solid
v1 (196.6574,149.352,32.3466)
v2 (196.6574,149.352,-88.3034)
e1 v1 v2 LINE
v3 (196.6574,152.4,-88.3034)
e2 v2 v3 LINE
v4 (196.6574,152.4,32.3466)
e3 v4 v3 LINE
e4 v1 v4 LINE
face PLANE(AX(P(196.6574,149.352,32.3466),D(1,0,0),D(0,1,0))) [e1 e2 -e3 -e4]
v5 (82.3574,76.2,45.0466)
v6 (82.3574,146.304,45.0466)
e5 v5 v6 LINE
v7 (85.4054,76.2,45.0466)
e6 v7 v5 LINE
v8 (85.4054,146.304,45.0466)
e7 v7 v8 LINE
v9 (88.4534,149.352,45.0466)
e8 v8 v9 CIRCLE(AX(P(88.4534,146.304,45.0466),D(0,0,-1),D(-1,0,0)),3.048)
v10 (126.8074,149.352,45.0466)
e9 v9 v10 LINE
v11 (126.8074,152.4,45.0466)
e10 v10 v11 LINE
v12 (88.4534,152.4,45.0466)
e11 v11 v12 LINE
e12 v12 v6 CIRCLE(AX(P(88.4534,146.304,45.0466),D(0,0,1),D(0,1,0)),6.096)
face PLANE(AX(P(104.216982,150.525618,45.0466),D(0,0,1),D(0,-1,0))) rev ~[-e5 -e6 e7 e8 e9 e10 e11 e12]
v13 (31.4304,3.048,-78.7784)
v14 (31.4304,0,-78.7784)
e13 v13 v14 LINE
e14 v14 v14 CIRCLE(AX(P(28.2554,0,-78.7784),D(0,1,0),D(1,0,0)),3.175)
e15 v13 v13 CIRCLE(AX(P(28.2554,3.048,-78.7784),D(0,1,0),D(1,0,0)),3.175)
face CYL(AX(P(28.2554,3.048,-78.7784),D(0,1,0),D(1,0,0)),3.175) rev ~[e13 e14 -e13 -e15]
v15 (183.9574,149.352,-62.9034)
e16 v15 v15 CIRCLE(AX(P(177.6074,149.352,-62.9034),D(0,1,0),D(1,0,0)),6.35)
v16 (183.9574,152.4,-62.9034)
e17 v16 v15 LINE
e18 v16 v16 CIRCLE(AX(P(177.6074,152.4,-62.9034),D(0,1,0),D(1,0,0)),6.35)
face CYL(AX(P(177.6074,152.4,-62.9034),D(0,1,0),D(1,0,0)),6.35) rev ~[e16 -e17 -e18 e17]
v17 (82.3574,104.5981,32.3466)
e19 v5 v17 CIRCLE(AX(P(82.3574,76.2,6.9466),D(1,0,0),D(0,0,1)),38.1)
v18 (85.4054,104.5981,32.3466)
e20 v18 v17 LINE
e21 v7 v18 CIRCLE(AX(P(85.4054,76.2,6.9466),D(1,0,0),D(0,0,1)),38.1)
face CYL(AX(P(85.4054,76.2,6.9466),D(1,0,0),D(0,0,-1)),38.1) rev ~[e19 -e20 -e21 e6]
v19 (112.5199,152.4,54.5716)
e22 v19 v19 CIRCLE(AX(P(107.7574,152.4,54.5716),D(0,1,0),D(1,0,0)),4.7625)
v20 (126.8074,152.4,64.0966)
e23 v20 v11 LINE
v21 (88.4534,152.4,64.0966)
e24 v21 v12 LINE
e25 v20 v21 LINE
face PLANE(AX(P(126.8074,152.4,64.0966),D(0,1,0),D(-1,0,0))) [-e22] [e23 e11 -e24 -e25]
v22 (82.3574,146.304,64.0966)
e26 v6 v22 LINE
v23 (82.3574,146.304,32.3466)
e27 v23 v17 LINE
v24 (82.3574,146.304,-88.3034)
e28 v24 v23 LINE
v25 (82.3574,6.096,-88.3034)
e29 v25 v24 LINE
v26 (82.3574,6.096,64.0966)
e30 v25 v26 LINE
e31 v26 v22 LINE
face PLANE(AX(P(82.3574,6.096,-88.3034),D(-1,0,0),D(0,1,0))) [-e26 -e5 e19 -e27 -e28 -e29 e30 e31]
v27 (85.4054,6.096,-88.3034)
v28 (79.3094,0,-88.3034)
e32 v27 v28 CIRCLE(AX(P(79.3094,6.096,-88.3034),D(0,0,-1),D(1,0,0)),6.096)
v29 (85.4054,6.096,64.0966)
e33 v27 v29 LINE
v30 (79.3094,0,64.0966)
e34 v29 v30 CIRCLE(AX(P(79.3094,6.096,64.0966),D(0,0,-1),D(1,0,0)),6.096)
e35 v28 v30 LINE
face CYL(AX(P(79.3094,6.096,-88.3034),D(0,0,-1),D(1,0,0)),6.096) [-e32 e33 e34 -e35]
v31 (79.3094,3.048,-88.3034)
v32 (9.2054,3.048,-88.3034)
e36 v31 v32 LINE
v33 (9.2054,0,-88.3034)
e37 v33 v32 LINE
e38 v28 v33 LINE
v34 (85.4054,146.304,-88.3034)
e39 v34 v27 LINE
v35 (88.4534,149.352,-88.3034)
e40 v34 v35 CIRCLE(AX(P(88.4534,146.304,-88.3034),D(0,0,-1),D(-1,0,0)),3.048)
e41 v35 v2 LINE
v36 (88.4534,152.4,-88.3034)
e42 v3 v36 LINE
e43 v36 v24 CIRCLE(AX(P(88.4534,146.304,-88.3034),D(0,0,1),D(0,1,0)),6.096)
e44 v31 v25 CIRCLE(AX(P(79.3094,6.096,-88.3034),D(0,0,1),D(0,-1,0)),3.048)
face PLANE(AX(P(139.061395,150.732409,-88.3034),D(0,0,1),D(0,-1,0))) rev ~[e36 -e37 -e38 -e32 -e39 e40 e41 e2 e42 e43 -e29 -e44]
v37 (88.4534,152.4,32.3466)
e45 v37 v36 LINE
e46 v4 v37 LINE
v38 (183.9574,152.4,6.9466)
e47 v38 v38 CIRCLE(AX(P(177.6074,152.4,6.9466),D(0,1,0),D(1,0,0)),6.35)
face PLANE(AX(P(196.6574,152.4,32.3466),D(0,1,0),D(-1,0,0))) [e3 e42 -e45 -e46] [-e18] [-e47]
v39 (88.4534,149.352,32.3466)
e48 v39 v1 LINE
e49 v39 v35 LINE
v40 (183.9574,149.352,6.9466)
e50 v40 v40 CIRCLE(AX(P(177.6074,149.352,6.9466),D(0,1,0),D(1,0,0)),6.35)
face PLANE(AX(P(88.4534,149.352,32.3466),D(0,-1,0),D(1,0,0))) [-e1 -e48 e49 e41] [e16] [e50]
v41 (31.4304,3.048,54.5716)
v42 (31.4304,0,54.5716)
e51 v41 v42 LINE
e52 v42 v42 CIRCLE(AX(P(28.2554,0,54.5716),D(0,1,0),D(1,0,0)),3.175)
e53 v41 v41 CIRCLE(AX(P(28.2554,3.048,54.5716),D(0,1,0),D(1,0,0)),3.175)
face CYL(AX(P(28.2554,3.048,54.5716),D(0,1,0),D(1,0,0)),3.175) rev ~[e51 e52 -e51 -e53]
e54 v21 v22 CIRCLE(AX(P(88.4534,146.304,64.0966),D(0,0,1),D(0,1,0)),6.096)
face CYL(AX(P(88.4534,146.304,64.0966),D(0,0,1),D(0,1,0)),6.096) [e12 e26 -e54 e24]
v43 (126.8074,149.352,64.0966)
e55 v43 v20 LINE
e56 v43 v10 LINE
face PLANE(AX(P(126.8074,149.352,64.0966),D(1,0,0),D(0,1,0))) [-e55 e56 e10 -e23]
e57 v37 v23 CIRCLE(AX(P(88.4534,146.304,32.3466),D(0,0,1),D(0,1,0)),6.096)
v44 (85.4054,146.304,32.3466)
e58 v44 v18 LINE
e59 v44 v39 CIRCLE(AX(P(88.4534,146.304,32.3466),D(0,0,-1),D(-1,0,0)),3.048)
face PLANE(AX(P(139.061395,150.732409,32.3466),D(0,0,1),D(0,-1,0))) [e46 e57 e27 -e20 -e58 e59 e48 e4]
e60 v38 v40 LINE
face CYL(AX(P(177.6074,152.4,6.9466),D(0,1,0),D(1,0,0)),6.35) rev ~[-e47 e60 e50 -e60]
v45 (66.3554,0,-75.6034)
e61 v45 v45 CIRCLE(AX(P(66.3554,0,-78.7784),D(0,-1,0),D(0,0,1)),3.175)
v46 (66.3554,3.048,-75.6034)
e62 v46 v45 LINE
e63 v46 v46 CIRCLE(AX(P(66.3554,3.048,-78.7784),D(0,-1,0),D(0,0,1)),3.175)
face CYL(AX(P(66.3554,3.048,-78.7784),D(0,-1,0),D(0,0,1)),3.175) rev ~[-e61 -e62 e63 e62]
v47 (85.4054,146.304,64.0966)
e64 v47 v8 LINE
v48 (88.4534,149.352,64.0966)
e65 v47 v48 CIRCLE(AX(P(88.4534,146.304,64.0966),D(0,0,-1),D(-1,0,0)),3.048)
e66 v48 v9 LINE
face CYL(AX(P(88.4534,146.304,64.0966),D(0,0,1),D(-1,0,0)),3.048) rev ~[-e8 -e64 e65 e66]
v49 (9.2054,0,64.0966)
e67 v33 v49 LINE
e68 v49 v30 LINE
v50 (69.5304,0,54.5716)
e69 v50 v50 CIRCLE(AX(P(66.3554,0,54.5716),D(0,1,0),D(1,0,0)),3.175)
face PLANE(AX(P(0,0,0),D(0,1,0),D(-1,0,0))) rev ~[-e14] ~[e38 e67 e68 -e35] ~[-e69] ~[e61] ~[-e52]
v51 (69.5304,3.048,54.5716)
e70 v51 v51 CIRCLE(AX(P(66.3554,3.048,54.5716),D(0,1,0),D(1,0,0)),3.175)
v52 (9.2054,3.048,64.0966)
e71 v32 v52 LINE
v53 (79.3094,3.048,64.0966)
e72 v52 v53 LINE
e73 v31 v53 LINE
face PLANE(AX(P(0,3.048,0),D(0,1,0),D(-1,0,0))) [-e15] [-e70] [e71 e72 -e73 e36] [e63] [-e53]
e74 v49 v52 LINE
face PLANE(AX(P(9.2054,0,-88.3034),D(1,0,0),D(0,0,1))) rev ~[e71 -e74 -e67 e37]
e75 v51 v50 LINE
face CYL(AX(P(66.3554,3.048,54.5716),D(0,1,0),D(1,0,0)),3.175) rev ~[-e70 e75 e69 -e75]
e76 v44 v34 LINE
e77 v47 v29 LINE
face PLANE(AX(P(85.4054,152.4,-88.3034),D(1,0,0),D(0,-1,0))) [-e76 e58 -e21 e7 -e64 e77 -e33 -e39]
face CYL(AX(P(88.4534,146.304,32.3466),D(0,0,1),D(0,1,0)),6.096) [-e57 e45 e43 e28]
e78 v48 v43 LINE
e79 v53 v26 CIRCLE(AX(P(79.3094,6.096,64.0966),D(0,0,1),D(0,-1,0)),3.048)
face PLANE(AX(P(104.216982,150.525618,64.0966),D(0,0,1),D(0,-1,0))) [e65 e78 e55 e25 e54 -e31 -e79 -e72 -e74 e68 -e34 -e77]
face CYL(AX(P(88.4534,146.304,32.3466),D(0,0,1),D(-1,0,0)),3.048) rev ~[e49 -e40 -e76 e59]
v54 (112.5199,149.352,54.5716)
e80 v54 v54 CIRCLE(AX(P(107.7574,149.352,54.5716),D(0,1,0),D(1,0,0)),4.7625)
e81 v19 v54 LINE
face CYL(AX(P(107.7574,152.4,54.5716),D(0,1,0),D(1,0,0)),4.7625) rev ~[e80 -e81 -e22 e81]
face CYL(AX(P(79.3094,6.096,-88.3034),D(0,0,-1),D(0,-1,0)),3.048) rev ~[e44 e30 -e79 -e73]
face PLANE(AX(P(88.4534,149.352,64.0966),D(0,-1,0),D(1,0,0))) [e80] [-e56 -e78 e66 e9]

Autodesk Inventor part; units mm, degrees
ref_plane "YZ Plane" through (0, 0, 0) normal (1, 0, 0) x (0, 1, 0)
ref_plane "XZ Plane" through (0, 0, 0) normal (0, 1, 0) x (-1, 0, 0)
ref_plane "XY Plane" through (0, 0, 0) normal (0, 0, 1) x (1, 0, 0)
sketch "Sketch1" plane through (0, 0, 0) normal (0, 1, 0) x (-1, 0, 0)
  line L0 (-9.2054, 64.0966) -> (-85.4054, 64.0966)
  line L1 (-85.4054, 64.0966) -> (-85.4054, -88.3034)
  line L2 (-85.4054, -88.3034) -> (-9.2054, -88.3034)
  line L3 (-9.2054, -88.3034) -> (-9.2054, 64.0966)
  point P0 (0, 0)
  dimension "d0" = 152.4
  dimension "d1" = 76.2
extrude "Plate1" add sketch "Sketch1" along normal blind 3.048
sketch "Sketch2" plane through (82.3574, 0, -88.3034) normal (1, 0, 0) x (0, 1, 0)
  line L0 (0, 152.4) -> (0, 0)
  line L1 (0, 0) -> (152.4, 0)
  line L2 (152.4, 0) -> (152.4, 152.4)
  line L3 (152.4, 152.4) -> (0, 152.4)
edge flange "Flange1" height 152.4 angle 90 thickness 3.048 bend radius 3.048 thickness toward (1, 0, 0) relief tear relief width 3.048 relief depth 1.524 edges at (85.4054, 3.048, -12.1034) wall of the first edge with corners at (82.3574, 0, 64.0966) (82.3574, 0, -88.3034) (82.3574, 152.4, -88.3034) (82.3574, 152.4, 64.0966)
bend "Bend1"
corner "Corner1"
sketch "Sketch3" plane through (85.4054, 152.4, 64.0966) normal (1, 0, 0) x (0, 0, -1)
  circle A0 centre (57.15, -76.2) radius 38.1
  line L0 (152.4, 0) -> (152.4, -146.304) projected
  line L1 (152.4, -152.4) -> (0, -152.4) projected
  point P0 (64.0966, -152.4)
  dimension "d13" = 76.2
  dimension "d14" = 95.25
  dimension "d15" = 76.2
extrude "Cut1" cut sketch "Sketch3" against normal blind 3.048
sketch "Sketch4" plane through (85.4054, 152.4, 64.0966) normal (1, 0, 0) x (0, 0, -1)
  circle A0 centre (57.15, -76.2) radius 38.1 projected
  line L0 (19.05, -76.2) -> (19.05, 0)
  line L1 (19.05, 0) -> (31.75, 0)
  line L2 (0, 0) -> (152.4, 0) projected
  line L3 (19.05, 0) -> (31.75, 0)
  line L4 (31.75, 0) -> (31.75, -47.8019)
  arc A1 (31.75, -47.8019) -> (19.05, -76.2) centre (57.15, -76.2) ccw
  point P0 (64.0966, -152.4)
  dimension "d18" = 12.7
extrude "Cut2" cut sketch "Sketch4" against normal blind 3.048 contours A0 L0 L1 L4
sketch "Sketch5" plane through (82.3574, 149.352, 32.3466) normal (0, 1, 0) x (-1, 0, 0)
  line L0 (0, -120.65) -> (0, 0)
  line L1 (0, 0) -> (-114.3, 0)
  line L2 (-114.3, 0) -> (-114.3, -120.65)
  line L3 (-114.3, -120.65) -> (0, -120.65)
edge flange "Flange2" height 114.3 angle 90 thickness 3.048 bend radius 3.048 thickness toward (0, 1, 0) relief tear relief width 3.048 relief depth 1.524 edges at (85.4054, 152.4, -27.9784) wall of the first edge with corners at (82.3574, 149.352, -88.3034) (82.3574, 149.352, 32.3466) (196.6574, 149.352, 32.3466) (196.6574, 149.352, -88.3034)
bend "Bend2"
corner "Corner2"
sketch "Sketch6" plane through (196.6574, 152.4, 32.3466) normal (0, 1, 0) x (1, 0, 0)
  line L0 (0, 120.65) -> (0, 0) projected
  line L1 (0, 0) -> (-108.204, 0) projected
  point P0 (-196.6574, 32.3466)
sketch "Sketch7" plane through (82.3574, 149.352, 64.0966) normal (0, 1, 0) x (-1, 0, 0)
  line L0 (0, -19.05) -> (0, 0)
  line L1 (0, 0) -> (-44.45, 0)
  line L2 (-44.45, 0) -> (-44.45, -19.05)
  line L3 (-44.45, -19.05) -> (0, -19.05)
edge flange "Flange3" height 44.45 angle 90 thickness 3.048 bend radius 3.048 thickness toward (0, 1, 0) relief tear relief width 3.048 relief depth 1.524 edges at (85.4054, 152.4, 54.5716) wall of the first edge with corners at (82.3574, 149.352, 45.0466) (82.3574, 149.352, 64.0966) (126.8074, 149.352, 64.0966) (126.8074, 149.352, 45.0466)
bend "Bend3"
corner "Corner3"
sketch "Sketch8" plane through (196.6574, 152.4, 32.3466) normal (0, 1, 0) x (1, 0, 0)
  circle A0 centre (-19.05, 95.25) radius 6.35
  line L0 (0, 120.65) -> (0, 0) projected
  circle A1 centre (-19.05, 25.4) radius 6.35 projected
  point P0 (-196.6574, 32.3466)
  dimension "d46" = 12.7
  dimension "d47" = 19.05
  dimension "d48" = 69.85
extrude "Cut4" cut sketch "Sketch8" against normal blind 3.048 contours A0
sketch "Sketch9" plane through (126.8074, 152.4, 64.0966) normal (0, 1, 0) x (1, 0, 0)
  circle A0 centre (-19.05, 9.525) radius 4.7625
  line L0 (0, 0) -> (-38.354, 0) projected
  line L1 (0, 19.05) -> (0, 0) projected
  point P0 (-126.8074, 64.0966)
  dimension "d51" = 9.525
  dimension "d52" = 9.525
  dimension "d53" = 19.05
extrude "Cut5" cut sketch "Sketch9" against normal blind 3.048
sketch "Sketch10" plane through (196.6574, 152.4, 32.3466) normal (0, 1, 0) x (1, 0, 0)
  circle A0 centre (-19.05, 25.4) radius 6.35
  line L0 (0, 120.65) -> (0, 0) projected
  circle A1 centre (-19.05, 95.25) radius 6.35 projected
  point P0 (-196.6574, 32.3466)
  dimension "d56" = 12.7
  dimension "d57" = 19.05
  dimension "d58" = 69.85
extrude "Cut6" cut sketch "Sketch10" against normal blind 3.048 contours A0
sketch "Sketch11" plane through (0, 3.048, 0) normal (0, 1, 0) x (1, 0, 0)
  circle A0 centre (28.2554, -54.5716) radius 3.175
  circle A1 centre (66.3554, -54.5716) radius 3.175
  line L0 (79.3094, -64.0966) -> (9.2054, -64.0966) projected
  line L1 (9.2054, -64.0966) -> (9.2054, 88.3034) projected
  line L2 (9.2054, 88.3034) -> (79.3094, 88.3034) projected
  circle A2 centre (28.2554, 78.7784) radius 3.175
  circle A3 centre (66.3554, 81.9534) radius 3.175
  point P0 (0, 0)
  dimension "d61" = 6.35
  dimension "d62" = 6.35
  dimension "d63" = 38.1
  dimension "d64" = 9.525
  dimension "d65" = 9.525
  dimension "d67" = 19.05
  dimension "d68" = 9.525
  dimension "d69" = 6.35
  dimension "d70" = 19.05
  dimension "d71" = 6.35
  dimension "d72" = 6.35
sketch "Sketch12" plane through (0, 3.048, 0) normal (0, 1, 0) x (1, 0, 0)
  circle A0 centre (66.3554, 78.7784) radius 3.175
  line L0 (9.2054, 88.3034) -> (79.3094, 88.3034) projected
  line L1 (9.2054, -64.0966) -> (9.2054, 88.3034) projected
  point P0 (0, 0)
  dimension "d73" = 6.35
  dimension "d74" = 9.525
  dimension "d75" = 57.15
extrude "Cut7" cut sketch "Sketch11" against normal blind 3.048 contours A0 | A1 | A2
hole "Hole1" at (66.3554, 3.048, -78.7784) direction (0, -1, 0) diameter 6.35 depth 3.048 tip angle 118
equation "\"d16\" = Thickness"
equation "\"d19\" = Thickness"
equation "\"d49\" = Thickness"
equation "\"d54\" = Thickness"
equation "\"d59\" = Thickness"
equation "\"d76\" = Thickness"
equation "\"d83\" = Thickness"
equation "\"d3\" = BendReliefWidth"
equation "\"d4\" = BendReliefDepth"
equation "\"d5\" = MinimumRemnant"
equation "\"d6\" = BendRadius"
equation "\"d9\" = BendRadius"
equation "\"d10\" = CornerReliefSize"
equation "\"d11\" = GapSize"
equation "\"d12\" = JacobiRadiusSize"
equation "\"d21\" = BendReliefWidth"
equation "\"d22\" = BendReliefDepth"
equation "\"d23\" = MinimumRemnant"
equation "\"d24\" = BendRadius"
equation "\"d27\" = BendRadius"
equation "\"d28\" = CornerReliefSize"
equation "\"d29\" = GapSize"
equation "\"d30\" = JacobiRadiusSize"
equation "\"d34\" = BendReliefWidth"
equation "\"d35\" = BendReliefDepth"
equation "\"d36\" = MinimumRemnant"
equation "\"d37\" = BendRadius"
equation "\"d40\" = BendRadius"
equation "\"d41\" = CornerReliefSize"
equation "\"d42\" = GapSize"
equation "\"d43\" = JacobiRadiusSize"
equation "\"BendRadius\" = Thickness"
equation "\"BendReliefWidth\" = Thickness"
equation "\"BendReliefDepth\" = 0.5 * Thickness"
equation "\"CornerReliefSize\" = 4 * Thickness"
equation "\"MinimumRemnant\" = 2 * Thickness"
equation "\"TransitionRadius\" = BendRadius"
equation "\"JacobiRadiusSize\" = BendRadius"
equation "\"GapSize\" = Thickness"
equation "\"d2\" = BendRadius"
equation "\"Thickness\" = 3.048"
properties part number "Tape Measure Dispenser Side 1"
